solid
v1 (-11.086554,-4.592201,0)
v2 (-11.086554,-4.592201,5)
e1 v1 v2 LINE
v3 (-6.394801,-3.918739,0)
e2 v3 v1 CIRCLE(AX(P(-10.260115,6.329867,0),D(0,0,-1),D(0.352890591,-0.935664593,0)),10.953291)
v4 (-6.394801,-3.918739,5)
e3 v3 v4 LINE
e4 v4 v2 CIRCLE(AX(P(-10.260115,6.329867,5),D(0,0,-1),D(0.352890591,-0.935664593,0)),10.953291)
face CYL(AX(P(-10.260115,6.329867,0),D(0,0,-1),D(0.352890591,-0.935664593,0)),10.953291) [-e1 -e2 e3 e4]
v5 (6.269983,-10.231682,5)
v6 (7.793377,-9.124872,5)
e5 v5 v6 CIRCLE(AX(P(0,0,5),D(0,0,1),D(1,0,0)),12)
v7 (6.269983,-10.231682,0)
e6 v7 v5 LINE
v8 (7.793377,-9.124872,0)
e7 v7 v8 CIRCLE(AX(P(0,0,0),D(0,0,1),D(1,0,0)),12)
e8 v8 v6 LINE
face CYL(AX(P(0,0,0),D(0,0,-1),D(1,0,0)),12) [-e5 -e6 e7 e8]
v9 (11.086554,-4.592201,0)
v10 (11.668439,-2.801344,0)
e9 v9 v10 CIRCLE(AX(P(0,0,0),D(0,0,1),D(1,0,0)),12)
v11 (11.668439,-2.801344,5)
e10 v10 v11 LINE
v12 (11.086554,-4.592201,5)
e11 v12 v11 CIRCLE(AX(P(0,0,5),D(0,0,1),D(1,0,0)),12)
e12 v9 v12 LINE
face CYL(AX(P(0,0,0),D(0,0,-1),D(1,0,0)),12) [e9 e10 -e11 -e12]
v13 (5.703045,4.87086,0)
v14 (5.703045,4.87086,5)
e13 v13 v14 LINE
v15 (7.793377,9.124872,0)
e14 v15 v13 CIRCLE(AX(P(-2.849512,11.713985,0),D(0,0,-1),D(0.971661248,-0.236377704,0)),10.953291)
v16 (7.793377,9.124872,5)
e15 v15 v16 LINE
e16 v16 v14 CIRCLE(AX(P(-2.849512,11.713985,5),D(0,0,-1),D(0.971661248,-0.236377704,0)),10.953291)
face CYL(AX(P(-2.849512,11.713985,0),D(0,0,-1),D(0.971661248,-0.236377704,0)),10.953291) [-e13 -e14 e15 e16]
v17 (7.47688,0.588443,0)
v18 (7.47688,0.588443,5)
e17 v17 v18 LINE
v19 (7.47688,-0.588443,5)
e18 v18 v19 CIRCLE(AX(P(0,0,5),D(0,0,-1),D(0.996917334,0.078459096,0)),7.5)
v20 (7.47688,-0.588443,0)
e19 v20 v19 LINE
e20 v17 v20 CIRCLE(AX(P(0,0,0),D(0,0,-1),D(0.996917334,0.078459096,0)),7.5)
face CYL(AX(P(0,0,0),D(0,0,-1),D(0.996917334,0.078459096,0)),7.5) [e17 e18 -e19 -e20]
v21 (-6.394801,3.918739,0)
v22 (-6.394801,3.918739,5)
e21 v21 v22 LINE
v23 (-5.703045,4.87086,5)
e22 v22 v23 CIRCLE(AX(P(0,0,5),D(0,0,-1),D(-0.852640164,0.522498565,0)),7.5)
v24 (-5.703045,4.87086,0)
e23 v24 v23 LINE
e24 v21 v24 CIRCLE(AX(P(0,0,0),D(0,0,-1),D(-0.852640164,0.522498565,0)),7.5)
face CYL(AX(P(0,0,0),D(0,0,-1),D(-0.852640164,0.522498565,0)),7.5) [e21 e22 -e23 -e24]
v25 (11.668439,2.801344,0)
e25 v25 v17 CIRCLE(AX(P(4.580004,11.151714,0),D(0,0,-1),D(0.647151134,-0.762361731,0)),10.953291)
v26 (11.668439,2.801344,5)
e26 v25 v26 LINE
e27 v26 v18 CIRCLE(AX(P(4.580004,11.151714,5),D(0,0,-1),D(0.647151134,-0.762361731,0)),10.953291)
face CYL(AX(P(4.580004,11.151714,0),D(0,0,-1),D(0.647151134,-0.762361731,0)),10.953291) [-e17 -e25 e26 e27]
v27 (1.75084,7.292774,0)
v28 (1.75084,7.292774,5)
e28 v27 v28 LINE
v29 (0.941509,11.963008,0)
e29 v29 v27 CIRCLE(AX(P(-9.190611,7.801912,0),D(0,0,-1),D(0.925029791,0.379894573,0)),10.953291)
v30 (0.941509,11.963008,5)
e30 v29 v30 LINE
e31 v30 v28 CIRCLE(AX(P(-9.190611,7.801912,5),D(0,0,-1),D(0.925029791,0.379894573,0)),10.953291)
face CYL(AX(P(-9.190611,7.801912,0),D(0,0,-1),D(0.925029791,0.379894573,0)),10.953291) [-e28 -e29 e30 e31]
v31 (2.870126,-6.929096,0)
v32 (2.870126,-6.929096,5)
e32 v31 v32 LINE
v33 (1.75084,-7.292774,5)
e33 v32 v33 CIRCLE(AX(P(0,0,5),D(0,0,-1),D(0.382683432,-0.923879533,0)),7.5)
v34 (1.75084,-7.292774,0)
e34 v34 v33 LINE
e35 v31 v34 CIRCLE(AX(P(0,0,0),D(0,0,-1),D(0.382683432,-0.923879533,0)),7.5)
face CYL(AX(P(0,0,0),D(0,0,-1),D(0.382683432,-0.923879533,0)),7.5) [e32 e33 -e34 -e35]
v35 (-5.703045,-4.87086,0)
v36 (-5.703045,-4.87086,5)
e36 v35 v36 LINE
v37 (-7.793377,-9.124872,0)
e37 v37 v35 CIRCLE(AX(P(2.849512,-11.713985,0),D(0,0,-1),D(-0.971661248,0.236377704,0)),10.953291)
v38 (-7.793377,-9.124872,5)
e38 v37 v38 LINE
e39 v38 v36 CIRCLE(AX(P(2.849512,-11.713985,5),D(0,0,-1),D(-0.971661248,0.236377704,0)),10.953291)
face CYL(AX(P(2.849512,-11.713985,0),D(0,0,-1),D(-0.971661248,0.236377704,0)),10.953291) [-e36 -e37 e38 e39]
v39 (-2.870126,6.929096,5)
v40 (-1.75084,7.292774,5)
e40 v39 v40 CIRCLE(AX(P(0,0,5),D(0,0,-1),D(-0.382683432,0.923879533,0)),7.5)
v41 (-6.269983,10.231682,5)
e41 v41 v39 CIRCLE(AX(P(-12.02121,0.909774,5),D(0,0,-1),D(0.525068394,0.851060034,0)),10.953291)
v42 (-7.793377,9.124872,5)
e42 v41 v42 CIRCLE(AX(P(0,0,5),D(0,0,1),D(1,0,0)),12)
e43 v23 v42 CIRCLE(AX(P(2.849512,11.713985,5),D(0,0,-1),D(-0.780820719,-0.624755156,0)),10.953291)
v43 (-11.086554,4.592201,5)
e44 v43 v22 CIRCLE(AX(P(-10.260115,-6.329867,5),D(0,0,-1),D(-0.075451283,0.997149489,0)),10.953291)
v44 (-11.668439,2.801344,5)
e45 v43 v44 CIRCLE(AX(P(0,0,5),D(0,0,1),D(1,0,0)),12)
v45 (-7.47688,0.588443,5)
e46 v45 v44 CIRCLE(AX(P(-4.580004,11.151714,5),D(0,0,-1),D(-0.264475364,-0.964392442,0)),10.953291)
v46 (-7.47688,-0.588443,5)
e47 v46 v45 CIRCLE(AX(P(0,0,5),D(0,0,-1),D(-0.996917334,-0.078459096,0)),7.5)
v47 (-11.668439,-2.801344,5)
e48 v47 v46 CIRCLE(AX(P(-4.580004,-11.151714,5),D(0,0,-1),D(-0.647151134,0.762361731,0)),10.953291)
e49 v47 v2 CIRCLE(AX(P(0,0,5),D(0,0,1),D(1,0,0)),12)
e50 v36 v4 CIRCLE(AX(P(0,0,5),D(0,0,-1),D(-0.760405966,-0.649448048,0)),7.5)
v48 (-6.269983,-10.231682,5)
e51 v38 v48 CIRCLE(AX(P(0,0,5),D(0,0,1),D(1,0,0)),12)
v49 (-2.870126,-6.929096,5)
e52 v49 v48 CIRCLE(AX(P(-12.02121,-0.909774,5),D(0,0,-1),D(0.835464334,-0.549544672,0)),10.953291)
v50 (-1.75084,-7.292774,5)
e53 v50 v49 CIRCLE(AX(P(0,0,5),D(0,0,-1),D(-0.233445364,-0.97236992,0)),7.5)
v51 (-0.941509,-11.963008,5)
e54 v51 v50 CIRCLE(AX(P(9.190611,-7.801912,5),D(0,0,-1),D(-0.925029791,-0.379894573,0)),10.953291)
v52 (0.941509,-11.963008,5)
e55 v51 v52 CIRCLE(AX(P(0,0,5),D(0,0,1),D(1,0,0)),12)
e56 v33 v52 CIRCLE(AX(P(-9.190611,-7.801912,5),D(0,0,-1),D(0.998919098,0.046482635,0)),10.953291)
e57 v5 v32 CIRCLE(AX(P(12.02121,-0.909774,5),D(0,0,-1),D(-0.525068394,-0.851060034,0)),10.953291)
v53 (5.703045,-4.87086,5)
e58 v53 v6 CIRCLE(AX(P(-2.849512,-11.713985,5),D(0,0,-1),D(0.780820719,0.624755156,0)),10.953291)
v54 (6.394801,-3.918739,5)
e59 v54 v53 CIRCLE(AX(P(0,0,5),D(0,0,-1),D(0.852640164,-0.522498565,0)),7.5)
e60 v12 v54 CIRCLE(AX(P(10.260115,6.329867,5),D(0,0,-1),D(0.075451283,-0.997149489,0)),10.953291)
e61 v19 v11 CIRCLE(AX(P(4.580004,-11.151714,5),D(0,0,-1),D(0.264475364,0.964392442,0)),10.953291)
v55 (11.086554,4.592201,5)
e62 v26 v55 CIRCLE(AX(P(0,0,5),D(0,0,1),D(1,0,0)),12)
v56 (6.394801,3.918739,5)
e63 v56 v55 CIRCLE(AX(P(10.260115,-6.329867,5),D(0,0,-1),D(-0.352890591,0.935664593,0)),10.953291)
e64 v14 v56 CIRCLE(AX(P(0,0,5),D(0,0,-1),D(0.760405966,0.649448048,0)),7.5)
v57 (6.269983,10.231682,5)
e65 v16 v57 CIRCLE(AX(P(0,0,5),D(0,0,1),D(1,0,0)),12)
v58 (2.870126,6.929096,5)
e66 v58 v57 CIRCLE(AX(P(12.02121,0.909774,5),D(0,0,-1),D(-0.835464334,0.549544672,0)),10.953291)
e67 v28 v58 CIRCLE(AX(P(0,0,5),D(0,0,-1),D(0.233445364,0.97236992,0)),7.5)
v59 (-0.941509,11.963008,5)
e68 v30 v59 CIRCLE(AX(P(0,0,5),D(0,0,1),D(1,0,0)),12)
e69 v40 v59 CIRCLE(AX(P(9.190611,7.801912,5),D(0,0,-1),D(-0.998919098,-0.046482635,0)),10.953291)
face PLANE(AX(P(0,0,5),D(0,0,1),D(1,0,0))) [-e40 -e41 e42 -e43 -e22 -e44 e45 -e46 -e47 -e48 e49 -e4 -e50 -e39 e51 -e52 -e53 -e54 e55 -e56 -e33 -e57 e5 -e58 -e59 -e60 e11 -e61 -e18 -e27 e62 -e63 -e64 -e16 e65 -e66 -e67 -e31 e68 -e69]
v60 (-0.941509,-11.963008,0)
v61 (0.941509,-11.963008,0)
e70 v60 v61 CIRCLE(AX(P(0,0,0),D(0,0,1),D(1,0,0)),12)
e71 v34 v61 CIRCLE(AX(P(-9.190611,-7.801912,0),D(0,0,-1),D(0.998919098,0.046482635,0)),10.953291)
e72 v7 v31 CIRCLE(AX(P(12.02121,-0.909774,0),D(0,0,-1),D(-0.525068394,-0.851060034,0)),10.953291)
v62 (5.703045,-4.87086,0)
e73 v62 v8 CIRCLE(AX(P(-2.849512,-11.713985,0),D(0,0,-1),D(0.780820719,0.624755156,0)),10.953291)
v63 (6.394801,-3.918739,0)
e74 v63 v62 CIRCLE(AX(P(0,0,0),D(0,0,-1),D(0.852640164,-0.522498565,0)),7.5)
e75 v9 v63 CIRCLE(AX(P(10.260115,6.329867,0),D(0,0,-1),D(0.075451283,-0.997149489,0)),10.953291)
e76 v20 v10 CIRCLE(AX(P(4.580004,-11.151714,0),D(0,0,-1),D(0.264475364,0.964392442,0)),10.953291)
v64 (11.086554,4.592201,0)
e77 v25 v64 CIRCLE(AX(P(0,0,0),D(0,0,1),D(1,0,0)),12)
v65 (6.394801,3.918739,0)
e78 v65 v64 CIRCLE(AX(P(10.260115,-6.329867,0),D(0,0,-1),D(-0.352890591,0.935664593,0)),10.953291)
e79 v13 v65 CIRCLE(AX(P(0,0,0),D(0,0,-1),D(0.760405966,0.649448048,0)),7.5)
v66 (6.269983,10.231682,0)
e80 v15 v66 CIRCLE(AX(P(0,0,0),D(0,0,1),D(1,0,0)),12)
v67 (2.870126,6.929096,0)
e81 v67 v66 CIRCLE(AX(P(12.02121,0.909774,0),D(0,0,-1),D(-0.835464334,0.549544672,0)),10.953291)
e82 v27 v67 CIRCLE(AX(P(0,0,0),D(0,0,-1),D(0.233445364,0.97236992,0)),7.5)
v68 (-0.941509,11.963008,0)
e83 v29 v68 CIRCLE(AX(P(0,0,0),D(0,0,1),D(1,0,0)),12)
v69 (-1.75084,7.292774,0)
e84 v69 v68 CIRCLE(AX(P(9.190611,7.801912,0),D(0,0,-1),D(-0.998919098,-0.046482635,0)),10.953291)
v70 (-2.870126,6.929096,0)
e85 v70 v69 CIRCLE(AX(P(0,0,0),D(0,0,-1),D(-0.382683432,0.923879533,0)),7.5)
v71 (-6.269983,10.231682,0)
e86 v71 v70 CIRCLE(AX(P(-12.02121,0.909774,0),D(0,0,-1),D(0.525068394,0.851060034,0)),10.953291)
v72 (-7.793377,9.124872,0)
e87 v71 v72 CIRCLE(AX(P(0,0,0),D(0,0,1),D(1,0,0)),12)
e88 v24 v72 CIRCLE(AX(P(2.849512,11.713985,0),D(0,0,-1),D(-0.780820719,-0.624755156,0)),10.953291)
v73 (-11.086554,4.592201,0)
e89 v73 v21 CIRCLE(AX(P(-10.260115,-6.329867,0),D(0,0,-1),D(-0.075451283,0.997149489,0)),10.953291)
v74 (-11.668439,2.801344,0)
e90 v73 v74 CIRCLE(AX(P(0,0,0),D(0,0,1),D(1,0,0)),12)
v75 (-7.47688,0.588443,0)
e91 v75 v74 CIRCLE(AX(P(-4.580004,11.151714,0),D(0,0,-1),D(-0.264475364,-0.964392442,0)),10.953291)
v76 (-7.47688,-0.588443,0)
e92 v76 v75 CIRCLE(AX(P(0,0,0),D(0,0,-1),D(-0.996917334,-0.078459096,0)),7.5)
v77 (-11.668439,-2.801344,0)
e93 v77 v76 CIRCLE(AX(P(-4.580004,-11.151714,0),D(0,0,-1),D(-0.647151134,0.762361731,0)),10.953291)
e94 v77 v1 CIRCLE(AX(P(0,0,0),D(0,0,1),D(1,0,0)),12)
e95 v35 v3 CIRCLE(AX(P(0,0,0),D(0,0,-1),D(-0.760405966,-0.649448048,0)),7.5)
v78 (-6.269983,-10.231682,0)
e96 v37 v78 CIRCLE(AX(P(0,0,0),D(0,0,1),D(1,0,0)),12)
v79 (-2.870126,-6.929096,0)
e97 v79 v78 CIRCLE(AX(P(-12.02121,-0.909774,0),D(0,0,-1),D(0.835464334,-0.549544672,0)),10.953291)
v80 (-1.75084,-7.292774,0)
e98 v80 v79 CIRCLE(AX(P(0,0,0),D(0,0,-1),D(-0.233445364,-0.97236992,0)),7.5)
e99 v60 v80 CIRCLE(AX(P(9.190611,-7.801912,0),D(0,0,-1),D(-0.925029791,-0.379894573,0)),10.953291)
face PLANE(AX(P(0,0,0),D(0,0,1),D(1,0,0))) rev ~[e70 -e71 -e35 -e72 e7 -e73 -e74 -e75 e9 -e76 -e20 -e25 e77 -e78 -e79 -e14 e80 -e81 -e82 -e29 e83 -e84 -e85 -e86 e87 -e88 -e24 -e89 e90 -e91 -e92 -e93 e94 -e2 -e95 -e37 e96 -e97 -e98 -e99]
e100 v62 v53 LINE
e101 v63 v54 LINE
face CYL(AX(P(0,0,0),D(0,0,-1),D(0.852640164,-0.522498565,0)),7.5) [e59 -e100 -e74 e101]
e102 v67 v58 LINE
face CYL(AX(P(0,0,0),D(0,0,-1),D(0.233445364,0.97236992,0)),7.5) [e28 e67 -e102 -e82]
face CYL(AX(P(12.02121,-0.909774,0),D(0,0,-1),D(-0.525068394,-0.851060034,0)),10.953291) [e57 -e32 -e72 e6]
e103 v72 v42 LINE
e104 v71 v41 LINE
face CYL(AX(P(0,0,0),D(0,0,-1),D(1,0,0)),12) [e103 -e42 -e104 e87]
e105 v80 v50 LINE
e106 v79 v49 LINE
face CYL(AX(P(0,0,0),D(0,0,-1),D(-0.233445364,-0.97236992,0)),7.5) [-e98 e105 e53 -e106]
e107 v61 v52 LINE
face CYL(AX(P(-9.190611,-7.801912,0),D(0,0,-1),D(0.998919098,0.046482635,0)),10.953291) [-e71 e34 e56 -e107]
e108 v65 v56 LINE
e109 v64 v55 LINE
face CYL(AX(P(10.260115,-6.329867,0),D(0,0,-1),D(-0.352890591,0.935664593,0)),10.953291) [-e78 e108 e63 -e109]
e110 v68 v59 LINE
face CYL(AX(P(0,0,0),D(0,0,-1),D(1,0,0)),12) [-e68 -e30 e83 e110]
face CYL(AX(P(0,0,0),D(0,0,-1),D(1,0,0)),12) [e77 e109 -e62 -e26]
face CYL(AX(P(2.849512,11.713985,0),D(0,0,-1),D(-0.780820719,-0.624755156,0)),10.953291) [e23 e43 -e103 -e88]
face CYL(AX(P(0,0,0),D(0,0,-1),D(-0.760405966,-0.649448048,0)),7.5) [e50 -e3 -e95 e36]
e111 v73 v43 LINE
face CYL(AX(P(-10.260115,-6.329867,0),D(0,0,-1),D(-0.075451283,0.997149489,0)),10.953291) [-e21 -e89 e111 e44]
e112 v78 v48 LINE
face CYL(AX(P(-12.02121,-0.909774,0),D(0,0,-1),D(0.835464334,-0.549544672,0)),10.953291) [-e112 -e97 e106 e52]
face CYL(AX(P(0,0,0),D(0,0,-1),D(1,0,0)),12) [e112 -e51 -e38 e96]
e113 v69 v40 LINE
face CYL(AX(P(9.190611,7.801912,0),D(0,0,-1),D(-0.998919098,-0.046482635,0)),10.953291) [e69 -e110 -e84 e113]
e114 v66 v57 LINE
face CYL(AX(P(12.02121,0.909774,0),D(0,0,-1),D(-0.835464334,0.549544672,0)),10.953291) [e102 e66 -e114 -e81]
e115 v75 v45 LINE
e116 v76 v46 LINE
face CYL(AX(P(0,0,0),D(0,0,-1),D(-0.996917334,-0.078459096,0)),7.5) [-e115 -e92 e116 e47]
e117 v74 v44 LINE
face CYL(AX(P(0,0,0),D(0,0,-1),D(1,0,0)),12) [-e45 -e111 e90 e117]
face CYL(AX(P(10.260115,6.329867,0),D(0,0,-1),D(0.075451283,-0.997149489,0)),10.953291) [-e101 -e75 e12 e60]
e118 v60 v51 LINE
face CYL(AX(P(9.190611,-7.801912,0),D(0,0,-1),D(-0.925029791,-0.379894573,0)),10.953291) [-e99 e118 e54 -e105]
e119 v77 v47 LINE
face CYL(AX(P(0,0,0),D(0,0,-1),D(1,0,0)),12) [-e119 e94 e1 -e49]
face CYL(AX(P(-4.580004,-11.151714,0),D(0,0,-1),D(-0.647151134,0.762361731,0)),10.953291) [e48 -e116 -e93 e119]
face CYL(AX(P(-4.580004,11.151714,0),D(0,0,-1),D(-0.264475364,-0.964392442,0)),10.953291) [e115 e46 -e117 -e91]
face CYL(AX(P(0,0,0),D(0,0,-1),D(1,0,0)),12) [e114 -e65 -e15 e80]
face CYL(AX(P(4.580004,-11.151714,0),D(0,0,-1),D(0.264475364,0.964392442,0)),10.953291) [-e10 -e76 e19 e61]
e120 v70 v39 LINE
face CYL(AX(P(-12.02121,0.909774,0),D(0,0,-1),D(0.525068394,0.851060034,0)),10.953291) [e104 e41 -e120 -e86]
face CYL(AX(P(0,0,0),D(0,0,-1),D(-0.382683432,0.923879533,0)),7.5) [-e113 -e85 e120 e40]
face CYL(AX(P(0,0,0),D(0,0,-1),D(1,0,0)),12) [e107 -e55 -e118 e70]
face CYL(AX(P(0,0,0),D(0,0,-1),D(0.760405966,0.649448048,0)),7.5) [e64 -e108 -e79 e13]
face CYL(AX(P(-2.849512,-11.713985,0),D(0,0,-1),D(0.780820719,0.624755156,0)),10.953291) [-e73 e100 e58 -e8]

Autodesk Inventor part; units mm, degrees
sketch "Sketch1" plane through (0, 0, 0) normal (0, 0, 1) x (1, 0, 0)
  circle A0 centre (0, 0) radius 12
  dimension "d0" = 24
extrude "Extrusion1" add sketch "Sketch1" along normal blind 5
ref_plane "Work Plane2" through (0, 0, 2.5) normal (0, 0, 1) x (1, 0, 0)
sketch "Sketch2" plane through (0, 0, 0) normal (0, 0, -1) x (-1, 0, 0)
  circle A0 centre (0, 0) radius 12 projected
  circle A1 centre (0, 0) radius 10
  dimension "d3" = 20
surface extrude "Pitch Diameter" sketch "Sketch2" against normal through all shown no curves A1
ref_plane "Work Plane8" through (0, 0, 0) normal (0.9510565, 0.309017, 0) x (0, 0, 1)
ref_plane "Work Plane9" through (0, 0, 0) normal (1, 0, 0) x (0, 1, 0)
spur gear teeth "Spur Gear" teeth 10 pitch diameter 20 tip diameter 24 root diameter 15 face width 5 start plane through (0, 0, 0) normal (0, 0, -1) x (-1, 0, 0)
equation "\"d0\" = da_da"
equation "\"d1\" = da_b"
equation "\"d3\" = da_d"
equation "\"da_da\" = 24"
equation "\"da_b\" = 5"
equation "\"da_d\" = 20"
properties part number "Spur Gear1" material "Steel"
